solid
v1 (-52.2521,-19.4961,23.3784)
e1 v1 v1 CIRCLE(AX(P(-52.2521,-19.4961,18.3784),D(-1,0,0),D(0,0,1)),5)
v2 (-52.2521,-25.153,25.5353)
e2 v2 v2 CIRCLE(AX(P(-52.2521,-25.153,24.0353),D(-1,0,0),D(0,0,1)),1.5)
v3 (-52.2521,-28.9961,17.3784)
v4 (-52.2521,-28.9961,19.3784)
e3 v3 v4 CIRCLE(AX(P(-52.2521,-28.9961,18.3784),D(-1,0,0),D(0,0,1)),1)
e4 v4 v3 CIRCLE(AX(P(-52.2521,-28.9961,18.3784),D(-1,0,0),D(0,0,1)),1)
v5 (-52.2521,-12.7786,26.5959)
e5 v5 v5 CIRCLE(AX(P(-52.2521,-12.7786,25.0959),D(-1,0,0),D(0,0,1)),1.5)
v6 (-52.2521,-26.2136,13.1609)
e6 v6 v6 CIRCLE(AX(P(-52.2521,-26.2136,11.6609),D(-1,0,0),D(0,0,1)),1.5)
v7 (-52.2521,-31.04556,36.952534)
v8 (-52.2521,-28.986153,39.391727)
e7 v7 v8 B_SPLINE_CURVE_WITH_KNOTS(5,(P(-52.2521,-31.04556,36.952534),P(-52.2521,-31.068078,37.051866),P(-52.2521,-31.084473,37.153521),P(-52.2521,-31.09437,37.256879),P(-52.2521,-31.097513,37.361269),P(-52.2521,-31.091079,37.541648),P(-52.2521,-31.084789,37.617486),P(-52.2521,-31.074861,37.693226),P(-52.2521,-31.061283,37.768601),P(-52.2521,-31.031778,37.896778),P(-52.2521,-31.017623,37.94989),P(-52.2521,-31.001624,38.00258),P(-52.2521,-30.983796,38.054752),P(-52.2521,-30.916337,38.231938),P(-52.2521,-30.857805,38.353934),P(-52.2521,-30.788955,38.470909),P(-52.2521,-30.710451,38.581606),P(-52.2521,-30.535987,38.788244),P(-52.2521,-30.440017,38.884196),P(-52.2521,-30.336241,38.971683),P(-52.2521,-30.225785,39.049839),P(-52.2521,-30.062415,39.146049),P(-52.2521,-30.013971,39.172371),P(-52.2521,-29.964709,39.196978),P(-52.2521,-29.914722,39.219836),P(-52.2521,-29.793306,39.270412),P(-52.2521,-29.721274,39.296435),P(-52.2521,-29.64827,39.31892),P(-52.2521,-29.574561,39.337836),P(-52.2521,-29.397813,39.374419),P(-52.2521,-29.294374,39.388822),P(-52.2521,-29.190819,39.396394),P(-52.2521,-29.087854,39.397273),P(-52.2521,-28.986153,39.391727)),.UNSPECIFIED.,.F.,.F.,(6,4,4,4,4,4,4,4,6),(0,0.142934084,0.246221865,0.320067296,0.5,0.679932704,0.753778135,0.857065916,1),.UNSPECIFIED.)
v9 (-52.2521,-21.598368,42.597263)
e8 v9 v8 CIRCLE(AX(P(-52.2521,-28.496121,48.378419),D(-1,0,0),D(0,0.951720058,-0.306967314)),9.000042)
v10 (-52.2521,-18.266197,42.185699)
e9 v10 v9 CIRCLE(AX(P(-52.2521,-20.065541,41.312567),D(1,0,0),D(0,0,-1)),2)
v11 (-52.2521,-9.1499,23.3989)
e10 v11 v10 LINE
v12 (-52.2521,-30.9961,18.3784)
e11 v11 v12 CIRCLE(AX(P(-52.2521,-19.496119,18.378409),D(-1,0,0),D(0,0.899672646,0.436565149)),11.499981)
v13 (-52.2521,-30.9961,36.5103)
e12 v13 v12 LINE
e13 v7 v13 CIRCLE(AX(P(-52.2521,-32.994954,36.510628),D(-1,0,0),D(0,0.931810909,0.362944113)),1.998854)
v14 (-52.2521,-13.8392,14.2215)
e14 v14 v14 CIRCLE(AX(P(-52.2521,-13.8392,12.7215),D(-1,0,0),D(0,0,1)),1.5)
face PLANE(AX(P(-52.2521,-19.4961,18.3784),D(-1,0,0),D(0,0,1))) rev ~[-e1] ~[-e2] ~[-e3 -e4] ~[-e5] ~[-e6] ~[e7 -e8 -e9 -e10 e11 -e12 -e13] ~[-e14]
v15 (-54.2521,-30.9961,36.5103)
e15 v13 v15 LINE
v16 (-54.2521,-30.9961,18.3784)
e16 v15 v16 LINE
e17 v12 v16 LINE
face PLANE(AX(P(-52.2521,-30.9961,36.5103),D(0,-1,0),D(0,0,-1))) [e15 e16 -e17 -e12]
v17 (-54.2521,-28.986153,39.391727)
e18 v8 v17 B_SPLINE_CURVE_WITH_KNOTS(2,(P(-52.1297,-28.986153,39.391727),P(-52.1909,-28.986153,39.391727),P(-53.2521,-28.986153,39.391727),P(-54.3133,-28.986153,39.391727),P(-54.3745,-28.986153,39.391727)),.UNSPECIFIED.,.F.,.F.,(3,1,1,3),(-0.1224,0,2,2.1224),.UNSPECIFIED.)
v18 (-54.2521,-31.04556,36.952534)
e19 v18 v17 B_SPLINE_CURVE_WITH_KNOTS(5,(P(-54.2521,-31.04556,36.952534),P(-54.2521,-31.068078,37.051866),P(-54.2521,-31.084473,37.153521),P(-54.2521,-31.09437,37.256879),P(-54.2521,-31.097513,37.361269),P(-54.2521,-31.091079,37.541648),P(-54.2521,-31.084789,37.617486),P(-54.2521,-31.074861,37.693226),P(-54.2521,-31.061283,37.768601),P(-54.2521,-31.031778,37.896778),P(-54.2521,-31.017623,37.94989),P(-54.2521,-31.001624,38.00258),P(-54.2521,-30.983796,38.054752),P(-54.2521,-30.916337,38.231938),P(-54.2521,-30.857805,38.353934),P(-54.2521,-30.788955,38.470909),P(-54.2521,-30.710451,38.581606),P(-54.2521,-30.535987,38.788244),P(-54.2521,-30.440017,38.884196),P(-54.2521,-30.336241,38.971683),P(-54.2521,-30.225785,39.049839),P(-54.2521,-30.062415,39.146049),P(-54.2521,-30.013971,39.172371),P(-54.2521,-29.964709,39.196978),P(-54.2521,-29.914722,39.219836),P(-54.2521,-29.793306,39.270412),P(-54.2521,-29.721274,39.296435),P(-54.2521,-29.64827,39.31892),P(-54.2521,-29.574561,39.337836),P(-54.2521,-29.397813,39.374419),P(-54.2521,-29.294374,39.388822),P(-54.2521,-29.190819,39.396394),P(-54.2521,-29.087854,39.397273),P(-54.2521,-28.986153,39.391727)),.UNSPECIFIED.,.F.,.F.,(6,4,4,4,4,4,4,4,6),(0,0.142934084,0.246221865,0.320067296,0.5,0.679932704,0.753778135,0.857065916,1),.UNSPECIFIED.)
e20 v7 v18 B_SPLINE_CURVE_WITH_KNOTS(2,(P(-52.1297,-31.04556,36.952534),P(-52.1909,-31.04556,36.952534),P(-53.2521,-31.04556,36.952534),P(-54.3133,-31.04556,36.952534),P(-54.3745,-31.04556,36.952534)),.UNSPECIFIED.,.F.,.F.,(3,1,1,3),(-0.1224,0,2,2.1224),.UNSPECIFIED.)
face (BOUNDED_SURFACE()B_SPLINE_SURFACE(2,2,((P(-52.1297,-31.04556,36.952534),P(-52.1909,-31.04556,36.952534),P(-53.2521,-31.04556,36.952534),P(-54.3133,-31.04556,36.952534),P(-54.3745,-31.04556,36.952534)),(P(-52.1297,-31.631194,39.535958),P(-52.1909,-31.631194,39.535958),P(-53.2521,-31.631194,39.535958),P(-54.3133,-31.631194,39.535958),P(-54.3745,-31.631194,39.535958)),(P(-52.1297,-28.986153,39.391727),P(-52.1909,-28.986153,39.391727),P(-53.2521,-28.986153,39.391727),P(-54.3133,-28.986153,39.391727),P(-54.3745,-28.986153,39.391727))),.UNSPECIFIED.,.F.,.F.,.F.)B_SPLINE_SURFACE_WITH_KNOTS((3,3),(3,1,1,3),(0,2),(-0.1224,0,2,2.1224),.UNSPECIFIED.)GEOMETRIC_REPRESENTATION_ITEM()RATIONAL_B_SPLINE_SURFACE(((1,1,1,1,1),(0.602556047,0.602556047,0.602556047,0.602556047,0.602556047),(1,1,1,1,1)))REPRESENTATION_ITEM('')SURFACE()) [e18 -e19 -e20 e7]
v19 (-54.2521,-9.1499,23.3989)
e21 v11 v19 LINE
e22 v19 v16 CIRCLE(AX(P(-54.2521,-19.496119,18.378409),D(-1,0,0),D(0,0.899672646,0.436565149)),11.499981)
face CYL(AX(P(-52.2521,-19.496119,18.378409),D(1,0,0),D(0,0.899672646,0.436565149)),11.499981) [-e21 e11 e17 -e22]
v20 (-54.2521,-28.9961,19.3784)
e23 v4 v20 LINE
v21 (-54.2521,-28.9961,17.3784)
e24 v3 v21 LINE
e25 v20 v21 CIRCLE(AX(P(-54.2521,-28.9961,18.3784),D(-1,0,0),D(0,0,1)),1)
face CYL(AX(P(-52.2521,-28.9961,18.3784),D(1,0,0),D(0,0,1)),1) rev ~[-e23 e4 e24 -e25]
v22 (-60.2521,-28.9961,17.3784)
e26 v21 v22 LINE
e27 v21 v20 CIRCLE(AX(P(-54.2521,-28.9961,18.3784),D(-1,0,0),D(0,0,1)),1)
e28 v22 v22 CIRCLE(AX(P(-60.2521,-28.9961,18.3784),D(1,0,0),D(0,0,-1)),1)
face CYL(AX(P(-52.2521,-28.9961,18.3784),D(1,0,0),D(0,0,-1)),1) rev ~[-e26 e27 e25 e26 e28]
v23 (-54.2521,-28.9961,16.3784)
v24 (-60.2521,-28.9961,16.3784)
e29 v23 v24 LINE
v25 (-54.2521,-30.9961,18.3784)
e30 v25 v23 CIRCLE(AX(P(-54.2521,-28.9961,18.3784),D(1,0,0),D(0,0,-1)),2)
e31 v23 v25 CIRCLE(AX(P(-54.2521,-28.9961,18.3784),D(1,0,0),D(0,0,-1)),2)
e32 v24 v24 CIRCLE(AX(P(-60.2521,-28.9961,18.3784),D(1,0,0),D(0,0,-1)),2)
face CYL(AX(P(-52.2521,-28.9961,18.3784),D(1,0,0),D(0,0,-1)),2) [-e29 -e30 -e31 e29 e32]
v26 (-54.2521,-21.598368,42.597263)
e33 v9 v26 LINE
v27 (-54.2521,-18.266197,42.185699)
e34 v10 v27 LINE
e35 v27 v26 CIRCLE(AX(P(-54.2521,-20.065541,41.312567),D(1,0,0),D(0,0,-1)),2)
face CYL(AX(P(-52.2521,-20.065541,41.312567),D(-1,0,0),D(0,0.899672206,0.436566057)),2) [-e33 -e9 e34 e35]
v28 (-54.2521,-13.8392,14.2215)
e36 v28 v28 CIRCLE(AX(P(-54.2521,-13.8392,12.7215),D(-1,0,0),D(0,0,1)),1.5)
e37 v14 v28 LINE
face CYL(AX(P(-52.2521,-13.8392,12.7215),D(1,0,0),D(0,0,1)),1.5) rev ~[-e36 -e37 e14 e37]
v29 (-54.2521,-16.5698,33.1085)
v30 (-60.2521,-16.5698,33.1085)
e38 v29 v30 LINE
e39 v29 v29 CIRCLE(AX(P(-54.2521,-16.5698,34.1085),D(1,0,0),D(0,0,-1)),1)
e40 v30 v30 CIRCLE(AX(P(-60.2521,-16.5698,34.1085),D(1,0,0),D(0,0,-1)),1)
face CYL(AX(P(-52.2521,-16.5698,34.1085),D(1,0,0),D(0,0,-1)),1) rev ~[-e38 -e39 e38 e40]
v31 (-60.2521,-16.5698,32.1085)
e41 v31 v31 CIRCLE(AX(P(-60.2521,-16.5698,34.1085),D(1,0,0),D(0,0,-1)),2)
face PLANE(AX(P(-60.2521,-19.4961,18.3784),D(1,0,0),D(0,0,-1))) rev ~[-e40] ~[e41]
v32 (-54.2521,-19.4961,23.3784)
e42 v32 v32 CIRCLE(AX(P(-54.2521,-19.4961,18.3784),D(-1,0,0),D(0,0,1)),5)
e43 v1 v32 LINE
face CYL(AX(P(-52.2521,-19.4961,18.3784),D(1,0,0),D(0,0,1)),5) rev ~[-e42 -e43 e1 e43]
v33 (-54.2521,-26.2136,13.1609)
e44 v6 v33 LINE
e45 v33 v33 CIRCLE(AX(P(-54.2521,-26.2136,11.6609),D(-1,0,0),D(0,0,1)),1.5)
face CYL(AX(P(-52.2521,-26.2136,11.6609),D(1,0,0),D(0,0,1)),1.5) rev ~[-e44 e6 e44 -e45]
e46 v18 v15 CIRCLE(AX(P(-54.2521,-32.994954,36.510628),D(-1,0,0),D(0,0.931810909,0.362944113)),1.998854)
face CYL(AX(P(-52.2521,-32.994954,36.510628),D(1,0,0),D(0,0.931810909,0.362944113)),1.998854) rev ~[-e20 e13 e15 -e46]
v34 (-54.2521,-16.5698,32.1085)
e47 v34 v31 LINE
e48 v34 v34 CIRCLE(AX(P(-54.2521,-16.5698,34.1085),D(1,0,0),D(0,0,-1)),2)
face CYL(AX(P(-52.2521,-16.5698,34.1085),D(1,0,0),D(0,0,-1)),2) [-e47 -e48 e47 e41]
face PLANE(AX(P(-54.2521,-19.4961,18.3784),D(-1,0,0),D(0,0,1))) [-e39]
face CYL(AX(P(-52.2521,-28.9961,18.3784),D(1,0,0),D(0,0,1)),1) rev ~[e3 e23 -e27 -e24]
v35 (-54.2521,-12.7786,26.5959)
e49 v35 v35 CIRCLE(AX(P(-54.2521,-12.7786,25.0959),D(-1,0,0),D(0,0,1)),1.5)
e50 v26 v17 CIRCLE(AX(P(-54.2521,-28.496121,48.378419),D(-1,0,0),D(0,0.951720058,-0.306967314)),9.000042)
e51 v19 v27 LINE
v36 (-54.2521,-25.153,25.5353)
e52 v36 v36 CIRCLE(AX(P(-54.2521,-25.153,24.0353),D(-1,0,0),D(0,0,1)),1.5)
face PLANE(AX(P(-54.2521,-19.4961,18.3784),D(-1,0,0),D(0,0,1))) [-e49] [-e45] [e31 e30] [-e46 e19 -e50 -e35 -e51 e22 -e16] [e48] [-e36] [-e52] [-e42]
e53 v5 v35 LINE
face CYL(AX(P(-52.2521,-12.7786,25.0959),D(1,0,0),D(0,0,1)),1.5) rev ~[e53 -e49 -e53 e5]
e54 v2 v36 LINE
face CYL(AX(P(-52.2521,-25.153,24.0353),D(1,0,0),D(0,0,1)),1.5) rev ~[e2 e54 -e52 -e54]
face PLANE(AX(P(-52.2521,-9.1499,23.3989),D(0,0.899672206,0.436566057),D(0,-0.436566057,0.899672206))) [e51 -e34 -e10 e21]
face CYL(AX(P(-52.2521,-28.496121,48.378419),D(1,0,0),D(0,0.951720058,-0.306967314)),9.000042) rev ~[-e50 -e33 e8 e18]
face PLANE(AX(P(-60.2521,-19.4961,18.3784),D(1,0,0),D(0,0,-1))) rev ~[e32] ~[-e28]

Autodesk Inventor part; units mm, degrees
ref_plane "YZ Plane" through (0, 0, 0) normal (1, 0, 0) x (0, 1, 0)
ref_plane "XZ Plane" through (0, 0, 0) normal (0, 1, 0) x (-1, 0, 0)
ref_plane "XY Plane" through (0, 0, 0) normal (0, 0, 1) x (1, 0, 0)
ref_plane "作業平面1" through (-52.2521, -19.4961, 18.3784) normal (-1, 0, 0) x (0, 0, 1)
sketch "スケッチ1" plane through (-52.2521, -19.4961, 18.3784) normal (-1, 0, 0) x (0, 0, 1)
  line L0 (27.6413, -15.0569) -> (18.8577, -11.6363) projected
  arc A0 (27.6413, -15.0569) -> (32.8377, -3.1521) centre (30, -9) ccw projected
  line L1 (5.0205, 10.3462) -> (32.8377, -3.1521) projected
  arc A1 (5.0205, 10.3462) -> (0, -11.5) centre (0, 0) ccw projected
  line L2 (18.1319, -11.5) -> (0, -11.5) projected
  arc A2 (18.8577, -11.6363) -> (18.1319, -11.5) centre (18.1319, -13.5) ccw projected
  circle A3 centre (0, 0) radius 1.75 projected
  circle A4 centre (30, -9) radius 3.6 projected
  arc A5 (27.2373, -0.4345) -> (21.8406, -12.798) centre (30, -9) ccw
  circle A6 centre (6.7175, 6.7175) radius 1.6 projected
  circle A7 centre (-5.6569, 5.6569) radius 1.6 projected
  circle A8 centre (-6.7175, -6.7175) radius 1.6 projected
  circle A9 centre (5.6569, -5.6569) radius 1.6 projected
  circle A10 centre (15.7301, 2.9263) radius 2
  circle A11 centre (-5.6569, 5.6569) radius 1.5
  circle A12 centre (6.7175, 6.7175) radius 1.5
  circle A13 centre (5.6569, -5.6569) radius 1.5
  circle A14 centre (-6.7175, -6.7175) radius 1.5
  circle A15 centre (0, 0) radius 5
  circle A16 centre (0, -9.5) radius 1
  circle A17 centre (0, -9.5) radius 2
  line L3 (0, 0) -> (0, -11.5) construction
  circle A18 centre (15.7301, 2.9263) radius 1 projected
  circle A19 centre (0, -9.5) radius 1 projected
  point P0 (-18.3784, 19.4961)
  dimension "d0" = 9
  dimension "d4" = 4
  dimension "d8" = 3
  dimension "d9" = 10
  dimension "d10" = 4
  dimension "d11" = 2
extrude "押し出し1" add sketch "スケッチ1" along normal blind 2 contours A10 | A17 | L0 A2 L2 A1 L1 A5 | A6 | A7 | A8 | A9 | A18
fillet "フィレット1" radius 2 2 edges at (-53.2521, -19.9306, 45.6157) (-53.2521, -32.2941, 40.2191)
sketch "スケッチ2" plane through (-52.2521, -19.4961, 18.3784) normal (1, 0, 0) x (0, 0, -1)
  circle A0 centre (-15.7301, 2.9263) radius 2
  circle A1 centre (-15.7301, 2.9263) radius 1 projected
  circle A2 centre (0, -9.5) radius 1 projected
  circle A3 centre (0, -9.5) radius 2
  point P0 (18.3784, 19.4961)
  dimension "d5" = 4
extrude "押し出し2" add sketch "スケッチ2" against normal blind 8
properties part number "Motor_Cover"
